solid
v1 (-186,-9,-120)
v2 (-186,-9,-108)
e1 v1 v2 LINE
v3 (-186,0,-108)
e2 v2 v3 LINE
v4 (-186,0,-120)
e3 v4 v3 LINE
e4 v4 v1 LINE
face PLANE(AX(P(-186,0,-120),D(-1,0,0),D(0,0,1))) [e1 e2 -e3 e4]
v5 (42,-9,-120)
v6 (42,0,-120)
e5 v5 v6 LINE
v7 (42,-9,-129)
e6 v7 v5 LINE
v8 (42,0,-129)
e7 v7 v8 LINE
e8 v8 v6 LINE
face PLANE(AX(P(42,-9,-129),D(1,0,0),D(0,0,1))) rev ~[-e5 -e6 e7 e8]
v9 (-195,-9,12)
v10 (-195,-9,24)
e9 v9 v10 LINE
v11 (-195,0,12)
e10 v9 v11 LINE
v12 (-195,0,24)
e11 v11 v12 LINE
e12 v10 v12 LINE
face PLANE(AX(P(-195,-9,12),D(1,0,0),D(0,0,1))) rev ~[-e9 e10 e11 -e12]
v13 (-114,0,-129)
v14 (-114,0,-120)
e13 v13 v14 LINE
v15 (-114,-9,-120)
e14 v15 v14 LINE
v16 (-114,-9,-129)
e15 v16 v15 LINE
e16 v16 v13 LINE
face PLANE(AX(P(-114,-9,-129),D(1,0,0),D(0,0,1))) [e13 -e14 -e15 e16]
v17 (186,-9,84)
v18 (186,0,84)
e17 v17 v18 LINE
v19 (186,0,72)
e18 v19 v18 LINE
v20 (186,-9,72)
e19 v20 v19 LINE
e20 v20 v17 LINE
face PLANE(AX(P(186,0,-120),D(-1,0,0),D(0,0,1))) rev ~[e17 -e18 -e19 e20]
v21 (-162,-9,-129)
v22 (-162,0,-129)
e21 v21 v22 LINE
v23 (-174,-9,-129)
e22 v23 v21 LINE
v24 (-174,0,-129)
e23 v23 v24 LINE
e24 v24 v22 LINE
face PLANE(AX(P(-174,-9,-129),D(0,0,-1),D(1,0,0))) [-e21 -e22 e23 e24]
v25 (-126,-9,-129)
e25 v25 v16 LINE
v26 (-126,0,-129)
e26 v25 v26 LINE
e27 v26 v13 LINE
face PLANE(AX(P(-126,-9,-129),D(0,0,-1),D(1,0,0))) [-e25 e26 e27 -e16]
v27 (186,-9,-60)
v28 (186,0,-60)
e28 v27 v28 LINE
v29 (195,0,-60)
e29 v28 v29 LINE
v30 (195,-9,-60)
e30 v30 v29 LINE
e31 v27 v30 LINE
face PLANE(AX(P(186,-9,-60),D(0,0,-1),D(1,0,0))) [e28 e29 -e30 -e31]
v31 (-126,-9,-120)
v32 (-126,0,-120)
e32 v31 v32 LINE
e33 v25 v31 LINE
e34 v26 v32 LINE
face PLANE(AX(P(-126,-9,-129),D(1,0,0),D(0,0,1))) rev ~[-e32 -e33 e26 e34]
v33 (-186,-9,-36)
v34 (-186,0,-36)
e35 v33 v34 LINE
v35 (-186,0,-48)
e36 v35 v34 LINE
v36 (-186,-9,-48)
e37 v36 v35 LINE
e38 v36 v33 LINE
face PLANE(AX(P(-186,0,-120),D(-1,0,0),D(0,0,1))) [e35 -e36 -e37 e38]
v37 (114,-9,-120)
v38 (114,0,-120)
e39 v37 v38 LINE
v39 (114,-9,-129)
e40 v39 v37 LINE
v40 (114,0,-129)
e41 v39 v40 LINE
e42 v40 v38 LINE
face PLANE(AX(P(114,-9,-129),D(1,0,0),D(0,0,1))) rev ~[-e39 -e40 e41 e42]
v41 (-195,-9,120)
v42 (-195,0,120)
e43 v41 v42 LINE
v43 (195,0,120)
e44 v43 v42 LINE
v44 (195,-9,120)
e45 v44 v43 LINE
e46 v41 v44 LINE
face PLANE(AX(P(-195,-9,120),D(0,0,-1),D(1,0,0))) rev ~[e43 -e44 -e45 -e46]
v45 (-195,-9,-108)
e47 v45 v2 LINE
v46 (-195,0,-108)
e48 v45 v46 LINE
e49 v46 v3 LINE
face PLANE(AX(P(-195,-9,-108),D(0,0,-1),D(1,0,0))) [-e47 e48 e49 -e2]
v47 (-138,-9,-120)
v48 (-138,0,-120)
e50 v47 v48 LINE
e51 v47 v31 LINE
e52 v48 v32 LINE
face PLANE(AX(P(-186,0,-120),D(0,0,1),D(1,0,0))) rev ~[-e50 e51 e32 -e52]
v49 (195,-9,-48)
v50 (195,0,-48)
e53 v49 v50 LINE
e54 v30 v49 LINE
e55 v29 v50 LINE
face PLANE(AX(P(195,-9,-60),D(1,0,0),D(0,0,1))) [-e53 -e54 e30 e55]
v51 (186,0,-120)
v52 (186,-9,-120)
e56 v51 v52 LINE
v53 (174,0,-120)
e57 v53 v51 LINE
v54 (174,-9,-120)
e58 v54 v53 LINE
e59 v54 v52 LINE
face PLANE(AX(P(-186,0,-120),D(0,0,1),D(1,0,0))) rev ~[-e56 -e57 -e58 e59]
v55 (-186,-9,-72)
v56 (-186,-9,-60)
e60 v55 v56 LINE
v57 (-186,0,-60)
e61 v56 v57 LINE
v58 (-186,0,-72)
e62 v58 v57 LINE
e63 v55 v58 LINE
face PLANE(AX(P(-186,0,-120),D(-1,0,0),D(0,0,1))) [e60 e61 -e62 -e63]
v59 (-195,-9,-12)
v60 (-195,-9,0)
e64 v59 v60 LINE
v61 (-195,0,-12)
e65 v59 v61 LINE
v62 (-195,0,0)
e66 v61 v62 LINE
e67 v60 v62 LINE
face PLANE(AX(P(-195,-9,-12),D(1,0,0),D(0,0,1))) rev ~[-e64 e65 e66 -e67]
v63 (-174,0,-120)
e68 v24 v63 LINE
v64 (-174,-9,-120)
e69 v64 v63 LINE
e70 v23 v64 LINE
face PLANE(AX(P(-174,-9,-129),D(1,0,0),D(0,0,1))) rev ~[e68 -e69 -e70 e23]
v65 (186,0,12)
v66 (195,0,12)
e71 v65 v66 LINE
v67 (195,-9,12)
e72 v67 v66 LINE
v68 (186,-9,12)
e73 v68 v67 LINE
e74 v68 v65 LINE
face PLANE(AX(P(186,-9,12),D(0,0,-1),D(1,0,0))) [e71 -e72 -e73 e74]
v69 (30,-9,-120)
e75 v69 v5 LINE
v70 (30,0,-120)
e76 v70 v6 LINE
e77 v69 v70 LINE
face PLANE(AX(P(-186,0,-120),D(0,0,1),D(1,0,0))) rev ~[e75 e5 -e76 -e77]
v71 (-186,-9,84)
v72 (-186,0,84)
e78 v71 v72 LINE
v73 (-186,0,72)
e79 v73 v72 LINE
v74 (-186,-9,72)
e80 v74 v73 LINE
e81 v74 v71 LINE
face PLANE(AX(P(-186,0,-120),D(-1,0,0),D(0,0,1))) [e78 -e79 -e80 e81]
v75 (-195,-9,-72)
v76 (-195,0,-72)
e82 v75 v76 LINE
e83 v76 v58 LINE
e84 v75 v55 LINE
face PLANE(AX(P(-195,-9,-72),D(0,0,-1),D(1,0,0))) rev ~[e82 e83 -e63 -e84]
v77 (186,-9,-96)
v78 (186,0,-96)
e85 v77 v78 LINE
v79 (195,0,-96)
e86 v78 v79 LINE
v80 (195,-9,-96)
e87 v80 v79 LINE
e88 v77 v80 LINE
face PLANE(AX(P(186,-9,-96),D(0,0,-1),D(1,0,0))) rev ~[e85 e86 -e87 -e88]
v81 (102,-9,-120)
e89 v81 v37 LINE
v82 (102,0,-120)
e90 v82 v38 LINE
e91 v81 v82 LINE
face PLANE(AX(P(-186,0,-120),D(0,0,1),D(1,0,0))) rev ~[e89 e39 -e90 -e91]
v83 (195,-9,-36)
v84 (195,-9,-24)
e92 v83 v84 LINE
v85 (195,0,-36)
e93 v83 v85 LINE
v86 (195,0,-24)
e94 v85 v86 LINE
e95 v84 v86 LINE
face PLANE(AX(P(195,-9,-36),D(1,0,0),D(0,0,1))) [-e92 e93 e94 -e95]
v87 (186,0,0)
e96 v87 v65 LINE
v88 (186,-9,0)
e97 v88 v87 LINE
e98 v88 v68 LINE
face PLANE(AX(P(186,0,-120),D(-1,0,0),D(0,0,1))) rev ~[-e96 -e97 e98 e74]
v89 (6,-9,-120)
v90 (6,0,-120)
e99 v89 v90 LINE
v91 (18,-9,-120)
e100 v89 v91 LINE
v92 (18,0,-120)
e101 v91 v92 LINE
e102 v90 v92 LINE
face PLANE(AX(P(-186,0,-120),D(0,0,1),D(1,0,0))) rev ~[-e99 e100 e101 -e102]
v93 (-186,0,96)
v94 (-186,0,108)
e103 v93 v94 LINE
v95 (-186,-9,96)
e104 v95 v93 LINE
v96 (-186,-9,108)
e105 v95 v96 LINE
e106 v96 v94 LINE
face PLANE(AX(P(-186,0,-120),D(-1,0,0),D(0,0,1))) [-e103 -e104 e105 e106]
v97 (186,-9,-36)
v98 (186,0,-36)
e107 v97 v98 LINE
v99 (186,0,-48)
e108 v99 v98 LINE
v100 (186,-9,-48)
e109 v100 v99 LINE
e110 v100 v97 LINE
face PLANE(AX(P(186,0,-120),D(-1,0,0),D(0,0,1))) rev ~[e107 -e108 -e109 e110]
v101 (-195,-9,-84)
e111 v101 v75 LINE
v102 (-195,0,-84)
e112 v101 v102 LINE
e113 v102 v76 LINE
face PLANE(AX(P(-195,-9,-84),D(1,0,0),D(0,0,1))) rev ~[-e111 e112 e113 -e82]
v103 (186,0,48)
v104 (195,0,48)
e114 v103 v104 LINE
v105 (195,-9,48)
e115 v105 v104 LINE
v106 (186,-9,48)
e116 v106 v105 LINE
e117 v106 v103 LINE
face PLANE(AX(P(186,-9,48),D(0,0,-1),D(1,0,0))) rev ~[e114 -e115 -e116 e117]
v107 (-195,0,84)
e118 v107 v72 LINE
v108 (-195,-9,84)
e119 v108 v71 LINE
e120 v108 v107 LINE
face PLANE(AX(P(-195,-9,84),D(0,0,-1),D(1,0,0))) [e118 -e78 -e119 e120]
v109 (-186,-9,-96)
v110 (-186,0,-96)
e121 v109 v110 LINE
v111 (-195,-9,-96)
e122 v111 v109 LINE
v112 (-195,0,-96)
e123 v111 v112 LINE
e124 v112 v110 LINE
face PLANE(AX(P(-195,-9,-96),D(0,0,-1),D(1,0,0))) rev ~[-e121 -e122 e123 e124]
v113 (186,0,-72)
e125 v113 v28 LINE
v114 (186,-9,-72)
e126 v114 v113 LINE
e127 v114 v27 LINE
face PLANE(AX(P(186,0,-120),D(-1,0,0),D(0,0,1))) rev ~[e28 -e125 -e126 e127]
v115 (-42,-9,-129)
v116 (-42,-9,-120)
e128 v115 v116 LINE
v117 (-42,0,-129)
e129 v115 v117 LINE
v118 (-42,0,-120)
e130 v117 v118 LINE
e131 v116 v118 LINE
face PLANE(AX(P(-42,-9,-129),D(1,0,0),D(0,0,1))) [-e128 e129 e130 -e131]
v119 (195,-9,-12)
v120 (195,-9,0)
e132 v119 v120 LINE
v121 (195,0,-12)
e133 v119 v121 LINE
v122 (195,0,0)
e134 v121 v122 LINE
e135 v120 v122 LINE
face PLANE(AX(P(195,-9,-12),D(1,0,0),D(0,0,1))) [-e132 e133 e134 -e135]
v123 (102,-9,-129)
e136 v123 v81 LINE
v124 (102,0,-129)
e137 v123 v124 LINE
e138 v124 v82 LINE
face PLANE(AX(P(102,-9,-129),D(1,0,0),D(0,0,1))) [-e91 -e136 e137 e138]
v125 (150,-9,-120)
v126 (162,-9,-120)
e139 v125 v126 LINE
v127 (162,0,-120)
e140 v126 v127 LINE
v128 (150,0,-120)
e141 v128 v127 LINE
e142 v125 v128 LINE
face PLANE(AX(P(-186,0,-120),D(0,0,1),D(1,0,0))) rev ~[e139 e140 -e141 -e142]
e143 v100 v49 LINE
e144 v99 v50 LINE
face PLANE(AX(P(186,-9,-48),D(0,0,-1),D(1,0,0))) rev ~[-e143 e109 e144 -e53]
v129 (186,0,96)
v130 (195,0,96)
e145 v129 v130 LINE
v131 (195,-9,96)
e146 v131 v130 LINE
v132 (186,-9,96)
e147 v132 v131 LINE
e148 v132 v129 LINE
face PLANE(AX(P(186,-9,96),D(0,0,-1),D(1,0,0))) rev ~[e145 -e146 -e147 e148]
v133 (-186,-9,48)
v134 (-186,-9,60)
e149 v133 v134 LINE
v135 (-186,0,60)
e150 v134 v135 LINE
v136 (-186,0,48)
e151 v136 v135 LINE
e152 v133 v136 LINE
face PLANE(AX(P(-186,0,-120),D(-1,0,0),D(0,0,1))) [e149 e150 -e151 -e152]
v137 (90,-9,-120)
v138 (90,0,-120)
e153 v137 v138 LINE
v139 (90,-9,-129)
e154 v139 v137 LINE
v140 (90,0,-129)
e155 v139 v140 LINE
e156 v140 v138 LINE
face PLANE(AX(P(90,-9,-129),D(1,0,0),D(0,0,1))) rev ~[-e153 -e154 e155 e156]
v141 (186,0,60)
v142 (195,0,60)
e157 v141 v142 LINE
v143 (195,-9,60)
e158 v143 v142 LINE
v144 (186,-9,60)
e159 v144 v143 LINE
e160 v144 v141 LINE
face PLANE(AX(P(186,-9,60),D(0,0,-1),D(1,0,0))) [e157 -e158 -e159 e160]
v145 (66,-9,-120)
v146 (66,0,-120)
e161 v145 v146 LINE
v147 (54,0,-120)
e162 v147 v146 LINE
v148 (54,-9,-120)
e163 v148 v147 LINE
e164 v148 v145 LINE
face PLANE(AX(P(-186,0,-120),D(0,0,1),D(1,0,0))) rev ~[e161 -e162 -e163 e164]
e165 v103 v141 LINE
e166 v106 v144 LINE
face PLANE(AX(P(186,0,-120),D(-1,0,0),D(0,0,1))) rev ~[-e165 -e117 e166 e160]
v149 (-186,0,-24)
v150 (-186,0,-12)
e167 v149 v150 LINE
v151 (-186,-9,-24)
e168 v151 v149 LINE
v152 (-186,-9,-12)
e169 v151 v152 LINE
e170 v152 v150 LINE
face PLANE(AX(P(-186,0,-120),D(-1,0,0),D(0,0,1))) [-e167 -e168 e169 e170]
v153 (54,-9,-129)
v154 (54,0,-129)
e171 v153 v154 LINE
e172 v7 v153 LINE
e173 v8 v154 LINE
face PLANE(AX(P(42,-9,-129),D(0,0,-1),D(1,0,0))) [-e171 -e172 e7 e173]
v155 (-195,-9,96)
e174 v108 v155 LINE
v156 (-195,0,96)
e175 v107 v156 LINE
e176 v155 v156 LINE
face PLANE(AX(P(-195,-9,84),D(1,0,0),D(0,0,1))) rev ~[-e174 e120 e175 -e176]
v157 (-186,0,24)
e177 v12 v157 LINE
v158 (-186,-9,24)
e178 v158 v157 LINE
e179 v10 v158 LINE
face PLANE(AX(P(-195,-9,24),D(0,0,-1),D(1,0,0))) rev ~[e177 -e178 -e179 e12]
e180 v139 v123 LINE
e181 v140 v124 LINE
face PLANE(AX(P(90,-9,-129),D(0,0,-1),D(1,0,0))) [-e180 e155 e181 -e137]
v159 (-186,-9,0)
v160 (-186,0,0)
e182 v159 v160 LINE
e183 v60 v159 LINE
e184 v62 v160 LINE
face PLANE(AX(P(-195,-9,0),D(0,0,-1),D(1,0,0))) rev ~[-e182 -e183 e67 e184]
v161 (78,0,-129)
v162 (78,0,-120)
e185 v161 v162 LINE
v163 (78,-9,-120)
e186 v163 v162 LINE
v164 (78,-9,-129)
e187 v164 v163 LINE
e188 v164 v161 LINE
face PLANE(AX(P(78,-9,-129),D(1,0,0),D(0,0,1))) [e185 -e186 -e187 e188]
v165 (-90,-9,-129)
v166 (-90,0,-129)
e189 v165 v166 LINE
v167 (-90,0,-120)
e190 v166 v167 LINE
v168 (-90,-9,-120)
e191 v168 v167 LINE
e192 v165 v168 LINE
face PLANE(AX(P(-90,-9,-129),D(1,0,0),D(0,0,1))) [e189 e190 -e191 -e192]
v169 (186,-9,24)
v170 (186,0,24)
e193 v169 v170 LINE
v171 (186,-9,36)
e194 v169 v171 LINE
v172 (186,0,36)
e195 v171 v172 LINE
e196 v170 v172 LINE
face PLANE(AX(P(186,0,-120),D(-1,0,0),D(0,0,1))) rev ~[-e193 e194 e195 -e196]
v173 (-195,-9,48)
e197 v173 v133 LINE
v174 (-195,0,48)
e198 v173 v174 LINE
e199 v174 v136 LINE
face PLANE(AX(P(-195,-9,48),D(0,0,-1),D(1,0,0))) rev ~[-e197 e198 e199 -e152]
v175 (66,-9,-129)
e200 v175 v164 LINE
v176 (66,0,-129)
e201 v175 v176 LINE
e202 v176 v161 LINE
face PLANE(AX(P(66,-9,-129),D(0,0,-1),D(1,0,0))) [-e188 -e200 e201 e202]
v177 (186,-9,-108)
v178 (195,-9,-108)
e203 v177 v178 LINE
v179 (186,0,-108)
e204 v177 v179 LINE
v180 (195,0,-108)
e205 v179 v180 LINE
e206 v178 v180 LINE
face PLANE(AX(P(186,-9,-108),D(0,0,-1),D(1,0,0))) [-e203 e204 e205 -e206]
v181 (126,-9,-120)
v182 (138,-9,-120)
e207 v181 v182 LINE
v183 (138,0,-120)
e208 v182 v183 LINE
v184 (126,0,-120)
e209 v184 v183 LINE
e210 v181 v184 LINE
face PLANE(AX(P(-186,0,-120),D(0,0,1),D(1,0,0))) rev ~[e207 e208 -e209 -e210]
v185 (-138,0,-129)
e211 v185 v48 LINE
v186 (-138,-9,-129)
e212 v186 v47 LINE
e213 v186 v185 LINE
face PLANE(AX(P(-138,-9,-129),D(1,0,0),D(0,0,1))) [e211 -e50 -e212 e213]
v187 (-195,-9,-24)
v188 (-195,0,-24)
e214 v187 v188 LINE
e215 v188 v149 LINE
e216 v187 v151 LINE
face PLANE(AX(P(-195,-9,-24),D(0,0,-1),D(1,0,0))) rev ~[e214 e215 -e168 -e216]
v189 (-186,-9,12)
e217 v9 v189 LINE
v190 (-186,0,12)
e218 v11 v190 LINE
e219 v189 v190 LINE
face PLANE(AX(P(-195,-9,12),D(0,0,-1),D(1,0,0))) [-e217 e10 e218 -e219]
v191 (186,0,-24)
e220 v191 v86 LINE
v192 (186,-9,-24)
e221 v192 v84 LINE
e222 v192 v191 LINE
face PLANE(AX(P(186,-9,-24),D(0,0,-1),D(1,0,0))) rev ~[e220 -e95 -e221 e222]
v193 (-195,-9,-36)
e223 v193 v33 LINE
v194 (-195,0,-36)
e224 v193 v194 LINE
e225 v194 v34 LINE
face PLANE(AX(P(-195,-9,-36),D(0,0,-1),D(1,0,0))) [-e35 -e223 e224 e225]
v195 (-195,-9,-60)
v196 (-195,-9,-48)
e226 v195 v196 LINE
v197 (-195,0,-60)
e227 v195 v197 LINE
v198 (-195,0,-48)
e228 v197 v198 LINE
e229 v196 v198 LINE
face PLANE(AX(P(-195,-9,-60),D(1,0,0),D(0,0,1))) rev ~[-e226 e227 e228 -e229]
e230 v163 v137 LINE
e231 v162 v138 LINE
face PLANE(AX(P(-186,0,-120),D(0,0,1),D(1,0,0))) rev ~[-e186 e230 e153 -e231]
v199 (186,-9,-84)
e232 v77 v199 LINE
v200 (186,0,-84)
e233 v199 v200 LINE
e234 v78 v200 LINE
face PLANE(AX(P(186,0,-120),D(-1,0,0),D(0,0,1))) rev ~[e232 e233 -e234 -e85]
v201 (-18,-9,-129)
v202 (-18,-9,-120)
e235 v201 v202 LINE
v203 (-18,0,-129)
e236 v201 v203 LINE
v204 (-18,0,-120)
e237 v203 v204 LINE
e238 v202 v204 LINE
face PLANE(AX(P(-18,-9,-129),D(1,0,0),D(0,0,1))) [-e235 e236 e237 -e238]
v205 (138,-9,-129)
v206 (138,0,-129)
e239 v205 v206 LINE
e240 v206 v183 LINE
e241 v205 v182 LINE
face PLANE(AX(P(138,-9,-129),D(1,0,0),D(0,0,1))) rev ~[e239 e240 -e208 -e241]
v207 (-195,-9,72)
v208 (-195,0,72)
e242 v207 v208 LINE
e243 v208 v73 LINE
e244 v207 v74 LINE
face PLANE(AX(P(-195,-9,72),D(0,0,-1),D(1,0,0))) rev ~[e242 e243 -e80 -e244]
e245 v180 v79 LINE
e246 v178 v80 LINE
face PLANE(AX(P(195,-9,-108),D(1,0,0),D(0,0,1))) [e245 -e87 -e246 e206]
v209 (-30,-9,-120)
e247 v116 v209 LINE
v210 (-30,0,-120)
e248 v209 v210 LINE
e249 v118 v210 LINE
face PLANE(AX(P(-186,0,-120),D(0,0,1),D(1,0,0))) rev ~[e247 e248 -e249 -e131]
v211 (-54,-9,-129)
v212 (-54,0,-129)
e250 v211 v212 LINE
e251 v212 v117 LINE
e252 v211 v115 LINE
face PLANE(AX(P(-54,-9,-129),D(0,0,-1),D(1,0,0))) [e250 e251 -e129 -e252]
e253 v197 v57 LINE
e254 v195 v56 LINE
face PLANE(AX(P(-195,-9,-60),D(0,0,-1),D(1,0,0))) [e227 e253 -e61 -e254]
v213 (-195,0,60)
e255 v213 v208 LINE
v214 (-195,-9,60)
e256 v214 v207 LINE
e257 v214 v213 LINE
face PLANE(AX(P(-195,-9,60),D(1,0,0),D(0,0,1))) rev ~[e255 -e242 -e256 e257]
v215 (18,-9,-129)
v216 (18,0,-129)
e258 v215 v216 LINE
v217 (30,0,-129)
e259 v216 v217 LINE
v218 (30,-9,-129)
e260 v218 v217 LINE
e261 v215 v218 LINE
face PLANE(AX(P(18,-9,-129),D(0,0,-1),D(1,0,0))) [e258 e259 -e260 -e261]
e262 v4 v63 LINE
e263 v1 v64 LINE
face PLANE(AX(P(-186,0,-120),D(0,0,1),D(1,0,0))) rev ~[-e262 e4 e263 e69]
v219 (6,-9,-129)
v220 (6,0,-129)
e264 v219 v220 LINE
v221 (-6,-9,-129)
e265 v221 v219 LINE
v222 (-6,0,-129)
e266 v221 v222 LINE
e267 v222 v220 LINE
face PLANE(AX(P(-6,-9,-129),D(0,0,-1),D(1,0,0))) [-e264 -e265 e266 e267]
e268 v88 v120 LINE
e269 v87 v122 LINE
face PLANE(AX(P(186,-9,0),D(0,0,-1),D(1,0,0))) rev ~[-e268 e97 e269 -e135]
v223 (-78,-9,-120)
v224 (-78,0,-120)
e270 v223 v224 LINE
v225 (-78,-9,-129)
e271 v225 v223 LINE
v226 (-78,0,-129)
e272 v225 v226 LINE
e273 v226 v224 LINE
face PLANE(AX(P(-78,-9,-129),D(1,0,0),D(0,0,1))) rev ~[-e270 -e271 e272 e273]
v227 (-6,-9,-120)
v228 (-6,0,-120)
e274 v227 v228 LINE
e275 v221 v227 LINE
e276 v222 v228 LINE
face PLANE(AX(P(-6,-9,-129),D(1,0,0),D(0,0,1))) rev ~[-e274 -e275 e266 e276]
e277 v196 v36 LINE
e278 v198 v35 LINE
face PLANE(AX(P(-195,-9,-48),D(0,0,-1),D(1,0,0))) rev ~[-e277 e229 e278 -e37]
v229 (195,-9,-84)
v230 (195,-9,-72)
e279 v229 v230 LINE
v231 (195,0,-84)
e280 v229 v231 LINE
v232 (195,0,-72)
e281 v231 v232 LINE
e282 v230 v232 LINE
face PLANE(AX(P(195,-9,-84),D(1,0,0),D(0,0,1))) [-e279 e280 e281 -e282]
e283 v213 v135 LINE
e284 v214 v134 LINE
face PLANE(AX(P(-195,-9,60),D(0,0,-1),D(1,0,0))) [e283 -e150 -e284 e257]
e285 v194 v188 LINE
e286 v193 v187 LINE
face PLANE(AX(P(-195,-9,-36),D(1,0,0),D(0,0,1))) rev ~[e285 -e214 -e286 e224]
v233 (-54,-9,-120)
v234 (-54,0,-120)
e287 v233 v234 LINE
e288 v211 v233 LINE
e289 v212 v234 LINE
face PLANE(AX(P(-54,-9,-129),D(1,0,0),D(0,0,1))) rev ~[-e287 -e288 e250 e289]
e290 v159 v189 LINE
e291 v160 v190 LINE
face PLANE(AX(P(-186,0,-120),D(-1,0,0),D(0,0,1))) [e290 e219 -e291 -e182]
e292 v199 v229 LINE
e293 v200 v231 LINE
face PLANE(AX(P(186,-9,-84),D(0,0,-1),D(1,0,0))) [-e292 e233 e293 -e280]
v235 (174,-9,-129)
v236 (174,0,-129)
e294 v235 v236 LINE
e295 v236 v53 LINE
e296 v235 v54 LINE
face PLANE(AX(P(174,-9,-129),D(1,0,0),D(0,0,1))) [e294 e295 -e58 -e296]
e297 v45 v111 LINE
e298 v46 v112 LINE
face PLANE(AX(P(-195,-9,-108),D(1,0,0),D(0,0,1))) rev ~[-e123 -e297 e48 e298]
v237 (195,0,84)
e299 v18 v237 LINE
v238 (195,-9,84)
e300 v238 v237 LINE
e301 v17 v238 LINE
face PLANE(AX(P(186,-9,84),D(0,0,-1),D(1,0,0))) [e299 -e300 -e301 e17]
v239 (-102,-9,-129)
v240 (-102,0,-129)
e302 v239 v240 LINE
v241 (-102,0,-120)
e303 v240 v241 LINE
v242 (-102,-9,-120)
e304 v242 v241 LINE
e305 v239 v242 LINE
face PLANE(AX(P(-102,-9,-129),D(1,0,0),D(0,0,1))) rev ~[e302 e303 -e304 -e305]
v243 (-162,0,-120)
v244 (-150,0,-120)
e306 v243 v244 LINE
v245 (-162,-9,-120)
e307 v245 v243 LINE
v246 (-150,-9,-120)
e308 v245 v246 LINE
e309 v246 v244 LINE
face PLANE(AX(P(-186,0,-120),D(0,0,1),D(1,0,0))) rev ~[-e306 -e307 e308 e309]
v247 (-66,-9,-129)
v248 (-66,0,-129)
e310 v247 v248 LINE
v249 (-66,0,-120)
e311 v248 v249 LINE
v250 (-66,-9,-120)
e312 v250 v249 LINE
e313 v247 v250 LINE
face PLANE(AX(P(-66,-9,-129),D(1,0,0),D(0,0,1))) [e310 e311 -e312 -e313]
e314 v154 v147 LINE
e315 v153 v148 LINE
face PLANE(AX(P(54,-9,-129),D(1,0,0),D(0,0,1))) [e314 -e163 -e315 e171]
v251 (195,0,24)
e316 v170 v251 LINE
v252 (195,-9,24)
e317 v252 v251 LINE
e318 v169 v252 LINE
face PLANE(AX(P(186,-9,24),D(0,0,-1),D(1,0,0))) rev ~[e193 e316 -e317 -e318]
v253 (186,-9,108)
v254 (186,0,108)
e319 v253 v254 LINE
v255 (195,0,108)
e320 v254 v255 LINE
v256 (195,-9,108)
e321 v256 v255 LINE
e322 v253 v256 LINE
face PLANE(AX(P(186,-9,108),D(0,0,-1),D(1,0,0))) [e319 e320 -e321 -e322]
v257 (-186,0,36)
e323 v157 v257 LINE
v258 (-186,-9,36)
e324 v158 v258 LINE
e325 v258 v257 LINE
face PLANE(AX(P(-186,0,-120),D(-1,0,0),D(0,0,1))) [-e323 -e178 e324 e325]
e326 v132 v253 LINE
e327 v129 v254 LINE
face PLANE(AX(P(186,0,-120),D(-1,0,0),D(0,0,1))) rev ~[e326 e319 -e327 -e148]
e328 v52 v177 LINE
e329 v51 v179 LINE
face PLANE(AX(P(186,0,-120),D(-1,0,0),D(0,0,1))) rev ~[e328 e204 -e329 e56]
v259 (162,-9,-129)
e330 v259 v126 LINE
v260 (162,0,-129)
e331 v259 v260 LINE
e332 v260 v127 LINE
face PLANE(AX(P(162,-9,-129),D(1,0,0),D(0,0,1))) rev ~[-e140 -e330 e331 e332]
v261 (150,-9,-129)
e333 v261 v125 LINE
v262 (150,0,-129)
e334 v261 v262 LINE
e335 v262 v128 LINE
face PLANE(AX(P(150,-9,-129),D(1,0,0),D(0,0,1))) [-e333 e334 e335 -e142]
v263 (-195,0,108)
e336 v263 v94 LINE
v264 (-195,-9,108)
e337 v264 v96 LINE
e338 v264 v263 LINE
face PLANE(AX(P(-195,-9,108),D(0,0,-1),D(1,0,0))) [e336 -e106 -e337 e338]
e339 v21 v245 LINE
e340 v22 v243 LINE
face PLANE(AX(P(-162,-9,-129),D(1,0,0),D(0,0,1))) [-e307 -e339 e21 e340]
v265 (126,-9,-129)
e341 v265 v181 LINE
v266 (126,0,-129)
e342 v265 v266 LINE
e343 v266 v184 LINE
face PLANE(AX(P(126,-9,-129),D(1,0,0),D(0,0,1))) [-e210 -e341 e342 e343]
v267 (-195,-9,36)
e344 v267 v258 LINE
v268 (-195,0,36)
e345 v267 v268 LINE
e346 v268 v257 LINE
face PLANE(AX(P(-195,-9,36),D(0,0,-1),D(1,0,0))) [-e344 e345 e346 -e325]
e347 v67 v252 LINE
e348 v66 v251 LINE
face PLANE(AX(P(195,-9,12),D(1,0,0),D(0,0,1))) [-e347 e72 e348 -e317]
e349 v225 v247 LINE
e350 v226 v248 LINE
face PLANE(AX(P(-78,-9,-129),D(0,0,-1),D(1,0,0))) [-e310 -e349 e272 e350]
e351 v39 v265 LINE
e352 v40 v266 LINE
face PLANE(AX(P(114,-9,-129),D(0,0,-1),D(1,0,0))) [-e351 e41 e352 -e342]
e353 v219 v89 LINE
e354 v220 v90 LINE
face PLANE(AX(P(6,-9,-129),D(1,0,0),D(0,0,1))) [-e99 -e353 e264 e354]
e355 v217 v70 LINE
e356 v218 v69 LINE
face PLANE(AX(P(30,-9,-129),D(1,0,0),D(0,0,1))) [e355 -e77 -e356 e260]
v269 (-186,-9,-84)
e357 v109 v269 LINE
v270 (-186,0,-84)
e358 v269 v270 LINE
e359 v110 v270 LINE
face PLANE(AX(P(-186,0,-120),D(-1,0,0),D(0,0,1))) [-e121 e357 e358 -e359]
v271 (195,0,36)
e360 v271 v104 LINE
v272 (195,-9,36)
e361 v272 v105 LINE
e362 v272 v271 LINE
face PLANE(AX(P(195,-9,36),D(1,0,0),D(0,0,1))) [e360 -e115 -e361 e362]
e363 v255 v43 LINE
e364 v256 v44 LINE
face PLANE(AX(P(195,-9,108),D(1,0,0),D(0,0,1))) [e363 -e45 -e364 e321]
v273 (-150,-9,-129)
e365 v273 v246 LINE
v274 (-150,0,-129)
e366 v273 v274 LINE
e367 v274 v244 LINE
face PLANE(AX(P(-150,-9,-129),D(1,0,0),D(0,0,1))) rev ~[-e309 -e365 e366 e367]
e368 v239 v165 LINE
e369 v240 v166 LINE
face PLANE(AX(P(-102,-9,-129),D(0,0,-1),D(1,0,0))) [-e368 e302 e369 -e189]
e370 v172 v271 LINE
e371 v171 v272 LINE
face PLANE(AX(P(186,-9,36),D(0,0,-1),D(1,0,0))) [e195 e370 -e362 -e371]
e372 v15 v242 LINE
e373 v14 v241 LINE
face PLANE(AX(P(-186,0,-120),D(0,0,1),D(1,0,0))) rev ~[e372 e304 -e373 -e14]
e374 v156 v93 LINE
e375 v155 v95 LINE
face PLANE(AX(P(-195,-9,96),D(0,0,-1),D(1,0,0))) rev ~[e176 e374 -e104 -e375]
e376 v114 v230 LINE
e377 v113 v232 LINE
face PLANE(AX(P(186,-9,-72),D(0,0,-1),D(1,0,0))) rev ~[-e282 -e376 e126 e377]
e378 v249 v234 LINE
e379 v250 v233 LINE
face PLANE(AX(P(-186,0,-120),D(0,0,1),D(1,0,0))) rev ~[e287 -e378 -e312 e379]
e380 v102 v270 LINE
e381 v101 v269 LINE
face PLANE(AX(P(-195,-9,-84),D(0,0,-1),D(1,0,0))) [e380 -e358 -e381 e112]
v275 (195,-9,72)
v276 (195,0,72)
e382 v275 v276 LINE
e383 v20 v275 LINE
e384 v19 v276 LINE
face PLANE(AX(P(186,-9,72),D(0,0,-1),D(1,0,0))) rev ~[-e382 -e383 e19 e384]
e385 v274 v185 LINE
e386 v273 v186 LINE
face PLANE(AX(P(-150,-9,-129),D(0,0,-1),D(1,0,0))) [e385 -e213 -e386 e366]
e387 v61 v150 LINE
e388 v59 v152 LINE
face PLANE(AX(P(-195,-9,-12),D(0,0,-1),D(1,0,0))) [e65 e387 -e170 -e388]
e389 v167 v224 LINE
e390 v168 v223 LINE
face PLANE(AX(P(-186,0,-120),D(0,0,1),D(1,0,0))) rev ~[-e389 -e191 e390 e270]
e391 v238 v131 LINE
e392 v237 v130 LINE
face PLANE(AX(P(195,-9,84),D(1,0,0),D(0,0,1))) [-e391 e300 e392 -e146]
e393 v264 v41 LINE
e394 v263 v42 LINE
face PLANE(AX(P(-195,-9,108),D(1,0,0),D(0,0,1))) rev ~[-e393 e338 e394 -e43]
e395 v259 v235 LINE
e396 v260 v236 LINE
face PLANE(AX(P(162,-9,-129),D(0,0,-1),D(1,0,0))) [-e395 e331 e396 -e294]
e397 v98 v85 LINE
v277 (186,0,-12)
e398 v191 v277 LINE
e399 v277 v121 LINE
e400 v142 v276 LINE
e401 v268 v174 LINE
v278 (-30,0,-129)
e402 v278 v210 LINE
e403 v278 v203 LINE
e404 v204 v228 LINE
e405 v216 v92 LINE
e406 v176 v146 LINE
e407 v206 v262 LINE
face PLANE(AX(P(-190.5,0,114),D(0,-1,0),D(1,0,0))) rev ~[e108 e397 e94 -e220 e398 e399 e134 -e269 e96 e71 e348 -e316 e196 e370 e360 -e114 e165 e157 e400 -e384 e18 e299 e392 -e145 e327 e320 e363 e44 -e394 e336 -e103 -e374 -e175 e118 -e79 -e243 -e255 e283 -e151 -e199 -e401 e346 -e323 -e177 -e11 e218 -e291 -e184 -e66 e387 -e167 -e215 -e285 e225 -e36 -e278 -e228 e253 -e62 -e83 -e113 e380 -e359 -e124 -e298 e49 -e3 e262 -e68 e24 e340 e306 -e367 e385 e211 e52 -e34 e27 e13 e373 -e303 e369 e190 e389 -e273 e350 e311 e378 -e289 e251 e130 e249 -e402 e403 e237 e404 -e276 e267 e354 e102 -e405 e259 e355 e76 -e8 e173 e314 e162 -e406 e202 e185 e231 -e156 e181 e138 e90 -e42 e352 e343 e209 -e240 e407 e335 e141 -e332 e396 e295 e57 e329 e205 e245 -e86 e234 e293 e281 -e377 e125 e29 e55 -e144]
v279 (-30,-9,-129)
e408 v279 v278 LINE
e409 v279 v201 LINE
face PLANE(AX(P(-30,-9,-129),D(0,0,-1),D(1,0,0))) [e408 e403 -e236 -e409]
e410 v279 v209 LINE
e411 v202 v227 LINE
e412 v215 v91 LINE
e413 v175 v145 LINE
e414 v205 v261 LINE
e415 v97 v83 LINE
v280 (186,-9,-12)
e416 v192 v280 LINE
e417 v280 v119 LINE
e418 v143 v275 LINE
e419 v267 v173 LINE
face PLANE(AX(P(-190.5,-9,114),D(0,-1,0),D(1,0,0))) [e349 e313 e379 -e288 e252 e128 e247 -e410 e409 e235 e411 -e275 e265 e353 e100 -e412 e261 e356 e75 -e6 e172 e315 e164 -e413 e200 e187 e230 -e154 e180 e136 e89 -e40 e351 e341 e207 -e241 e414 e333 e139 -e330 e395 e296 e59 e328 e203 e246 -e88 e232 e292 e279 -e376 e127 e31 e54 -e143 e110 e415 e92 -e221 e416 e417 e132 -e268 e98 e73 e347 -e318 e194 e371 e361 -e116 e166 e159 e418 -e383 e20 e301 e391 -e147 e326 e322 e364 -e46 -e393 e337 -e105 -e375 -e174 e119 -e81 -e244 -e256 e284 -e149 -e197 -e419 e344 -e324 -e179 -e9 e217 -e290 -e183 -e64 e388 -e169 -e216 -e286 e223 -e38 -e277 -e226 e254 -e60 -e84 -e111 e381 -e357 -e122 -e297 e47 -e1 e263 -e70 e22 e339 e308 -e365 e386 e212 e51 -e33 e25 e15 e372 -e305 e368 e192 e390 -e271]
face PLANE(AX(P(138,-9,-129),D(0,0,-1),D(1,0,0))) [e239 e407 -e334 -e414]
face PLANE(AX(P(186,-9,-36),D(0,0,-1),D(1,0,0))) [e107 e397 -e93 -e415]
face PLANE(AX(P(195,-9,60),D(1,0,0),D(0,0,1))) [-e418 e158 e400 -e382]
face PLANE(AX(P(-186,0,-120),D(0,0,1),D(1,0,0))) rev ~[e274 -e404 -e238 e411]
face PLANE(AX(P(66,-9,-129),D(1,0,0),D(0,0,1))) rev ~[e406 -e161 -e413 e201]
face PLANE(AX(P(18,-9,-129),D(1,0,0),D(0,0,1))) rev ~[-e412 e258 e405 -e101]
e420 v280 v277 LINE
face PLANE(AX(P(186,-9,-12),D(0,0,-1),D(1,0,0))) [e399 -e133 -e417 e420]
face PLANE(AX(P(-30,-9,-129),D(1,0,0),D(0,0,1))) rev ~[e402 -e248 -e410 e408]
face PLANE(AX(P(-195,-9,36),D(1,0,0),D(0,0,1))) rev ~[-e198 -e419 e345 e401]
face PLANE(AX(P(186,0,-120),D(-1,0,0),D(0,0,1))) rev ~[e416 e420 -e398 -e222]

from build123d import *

# Parameters (mm, degrees)
F0_W     = 372
F0_H     = 240
F1_DEPTH = 9
F2_W     = 9
F2_H     = 12
F3_DEPTH = 9
F4_W     = 12
F4_H     = 9
F5_DEPTH = 9


with BuildPart() as f1:
    # F0 (on Front) → F1 (new body)
    with BuildSketch(Plane.XZ):
        Rectangle(F0_W, F0_H)
    extrude(amount=F1_DEPTH)

    # F2 (on face) → F3 (join, through all)
    with BuildSketch(Plane.XZ.offset(9)):
        with Locations((-190.5, 114)):
            Rectangle(F2_W, F2_H)
        with Locations((-190.5, 90)):
            Rectangle(F2_W, F2_H)
        with Locations((-190.5, 66)):
            Rectangle(F2_W, F2_H)
        with Locations((-190.5, 42)):
            Rectangle(F2_W, F2_H)
        with Locations((-190.5, 18)):
            Rectangle(F2_W, F2_H)
        with Locations((-190.5, -6)):
            Rectangle(F2_W, F2_H)
        with Locations((-190.5, -30)):
            Rectangle(F2_W, F2_H)
        with Locations((-190.5, -54)):
            Rectangle(F2_W, F2_H)
        with Locations((-190.5, -78)):
            Rectangle(F2_W, F2_H)
        with Locations((-190.5, -102)):
            Rectangle(F2_W, F2_H)
        with Locations((190.5, 114)):
            Rectangle(F2_W, F2_H)
        with Locations((190.5, 90)):
            Rectangle(F2_W, F2_H)
        with Locations((190.5, -30)):
            Rectangle(F2_W, F2_H)
        with Locations((190.5, -102)):
            Rectangle(F2_W, F2_H)
        with Locations((190.5, -6)):
            Rectangle(F2_W, F2_H)
        with Locations((190.5, -54)):
            Rectangle(F2_W, F2_H)
        with Locations((190.5, -78)):
            Rectangle(F2_W, F2_H)
        with Locations((190.5, 18)):
            Rectangle(F2_W, F2_H)
        with Locations((190.5, 42)):
            Rectangle(F2_W, F2_H)
        with Locations((190.5, 66)):
            Rectangle(F2_W, F2_H)
    extrude(amount=-F3_DEPTH)

    # F4 (on face) → F5 (join, through all)
    with BuildSketch(Plane.XZ.offset(9)):
        with Locations((0, -124.5)):
            Rectangle(F4_W, F4_H)
        with Locations((24, -124.5)):
            Rectangle(F4_W, F4_H)
        with Locations((48, -124.5)):
            Rectangle(F4_W, F4_H)
        with Locations((72, -124.5)):
            Rectangle(F4_W, F4_H)
        with Locations((96, -124.5)):
            Rectangle(F4_W, F4_H)
        with Locations((120, -124.5)):
            Rectangle(F4_W, F4_H)
        with Locations((144, -124.5)):
            Rectangle(F4_W, F4_H)
        with Locations((168, -124.5)):
            Rectangle(F4_W, F4_H)
        with Locations((-24, -124.5)):
            Rectangle(F4_W, F4_H)
        with Locations((-96, -124.5)):
            Rectangle(F4_W, F4_H)
        with Locations((-120, -124.5)):
            Rectangle(F4_W, F4_H)
        with Locations((-168, -124.5)):
            Rectangle(F4_W, F4_H)
        with Locations((-48, -124.5)):
            Rectangle(F4_W, F4_H)
        with Locations((-144, -124.5)):
            Rectangle(F4_W, F4_H)
        with Locations((-72, -124.5)):
            Rectangle(F4_W, F4_H)
    extrude(amount=-F5_DEPTH)


solid = f1.part
